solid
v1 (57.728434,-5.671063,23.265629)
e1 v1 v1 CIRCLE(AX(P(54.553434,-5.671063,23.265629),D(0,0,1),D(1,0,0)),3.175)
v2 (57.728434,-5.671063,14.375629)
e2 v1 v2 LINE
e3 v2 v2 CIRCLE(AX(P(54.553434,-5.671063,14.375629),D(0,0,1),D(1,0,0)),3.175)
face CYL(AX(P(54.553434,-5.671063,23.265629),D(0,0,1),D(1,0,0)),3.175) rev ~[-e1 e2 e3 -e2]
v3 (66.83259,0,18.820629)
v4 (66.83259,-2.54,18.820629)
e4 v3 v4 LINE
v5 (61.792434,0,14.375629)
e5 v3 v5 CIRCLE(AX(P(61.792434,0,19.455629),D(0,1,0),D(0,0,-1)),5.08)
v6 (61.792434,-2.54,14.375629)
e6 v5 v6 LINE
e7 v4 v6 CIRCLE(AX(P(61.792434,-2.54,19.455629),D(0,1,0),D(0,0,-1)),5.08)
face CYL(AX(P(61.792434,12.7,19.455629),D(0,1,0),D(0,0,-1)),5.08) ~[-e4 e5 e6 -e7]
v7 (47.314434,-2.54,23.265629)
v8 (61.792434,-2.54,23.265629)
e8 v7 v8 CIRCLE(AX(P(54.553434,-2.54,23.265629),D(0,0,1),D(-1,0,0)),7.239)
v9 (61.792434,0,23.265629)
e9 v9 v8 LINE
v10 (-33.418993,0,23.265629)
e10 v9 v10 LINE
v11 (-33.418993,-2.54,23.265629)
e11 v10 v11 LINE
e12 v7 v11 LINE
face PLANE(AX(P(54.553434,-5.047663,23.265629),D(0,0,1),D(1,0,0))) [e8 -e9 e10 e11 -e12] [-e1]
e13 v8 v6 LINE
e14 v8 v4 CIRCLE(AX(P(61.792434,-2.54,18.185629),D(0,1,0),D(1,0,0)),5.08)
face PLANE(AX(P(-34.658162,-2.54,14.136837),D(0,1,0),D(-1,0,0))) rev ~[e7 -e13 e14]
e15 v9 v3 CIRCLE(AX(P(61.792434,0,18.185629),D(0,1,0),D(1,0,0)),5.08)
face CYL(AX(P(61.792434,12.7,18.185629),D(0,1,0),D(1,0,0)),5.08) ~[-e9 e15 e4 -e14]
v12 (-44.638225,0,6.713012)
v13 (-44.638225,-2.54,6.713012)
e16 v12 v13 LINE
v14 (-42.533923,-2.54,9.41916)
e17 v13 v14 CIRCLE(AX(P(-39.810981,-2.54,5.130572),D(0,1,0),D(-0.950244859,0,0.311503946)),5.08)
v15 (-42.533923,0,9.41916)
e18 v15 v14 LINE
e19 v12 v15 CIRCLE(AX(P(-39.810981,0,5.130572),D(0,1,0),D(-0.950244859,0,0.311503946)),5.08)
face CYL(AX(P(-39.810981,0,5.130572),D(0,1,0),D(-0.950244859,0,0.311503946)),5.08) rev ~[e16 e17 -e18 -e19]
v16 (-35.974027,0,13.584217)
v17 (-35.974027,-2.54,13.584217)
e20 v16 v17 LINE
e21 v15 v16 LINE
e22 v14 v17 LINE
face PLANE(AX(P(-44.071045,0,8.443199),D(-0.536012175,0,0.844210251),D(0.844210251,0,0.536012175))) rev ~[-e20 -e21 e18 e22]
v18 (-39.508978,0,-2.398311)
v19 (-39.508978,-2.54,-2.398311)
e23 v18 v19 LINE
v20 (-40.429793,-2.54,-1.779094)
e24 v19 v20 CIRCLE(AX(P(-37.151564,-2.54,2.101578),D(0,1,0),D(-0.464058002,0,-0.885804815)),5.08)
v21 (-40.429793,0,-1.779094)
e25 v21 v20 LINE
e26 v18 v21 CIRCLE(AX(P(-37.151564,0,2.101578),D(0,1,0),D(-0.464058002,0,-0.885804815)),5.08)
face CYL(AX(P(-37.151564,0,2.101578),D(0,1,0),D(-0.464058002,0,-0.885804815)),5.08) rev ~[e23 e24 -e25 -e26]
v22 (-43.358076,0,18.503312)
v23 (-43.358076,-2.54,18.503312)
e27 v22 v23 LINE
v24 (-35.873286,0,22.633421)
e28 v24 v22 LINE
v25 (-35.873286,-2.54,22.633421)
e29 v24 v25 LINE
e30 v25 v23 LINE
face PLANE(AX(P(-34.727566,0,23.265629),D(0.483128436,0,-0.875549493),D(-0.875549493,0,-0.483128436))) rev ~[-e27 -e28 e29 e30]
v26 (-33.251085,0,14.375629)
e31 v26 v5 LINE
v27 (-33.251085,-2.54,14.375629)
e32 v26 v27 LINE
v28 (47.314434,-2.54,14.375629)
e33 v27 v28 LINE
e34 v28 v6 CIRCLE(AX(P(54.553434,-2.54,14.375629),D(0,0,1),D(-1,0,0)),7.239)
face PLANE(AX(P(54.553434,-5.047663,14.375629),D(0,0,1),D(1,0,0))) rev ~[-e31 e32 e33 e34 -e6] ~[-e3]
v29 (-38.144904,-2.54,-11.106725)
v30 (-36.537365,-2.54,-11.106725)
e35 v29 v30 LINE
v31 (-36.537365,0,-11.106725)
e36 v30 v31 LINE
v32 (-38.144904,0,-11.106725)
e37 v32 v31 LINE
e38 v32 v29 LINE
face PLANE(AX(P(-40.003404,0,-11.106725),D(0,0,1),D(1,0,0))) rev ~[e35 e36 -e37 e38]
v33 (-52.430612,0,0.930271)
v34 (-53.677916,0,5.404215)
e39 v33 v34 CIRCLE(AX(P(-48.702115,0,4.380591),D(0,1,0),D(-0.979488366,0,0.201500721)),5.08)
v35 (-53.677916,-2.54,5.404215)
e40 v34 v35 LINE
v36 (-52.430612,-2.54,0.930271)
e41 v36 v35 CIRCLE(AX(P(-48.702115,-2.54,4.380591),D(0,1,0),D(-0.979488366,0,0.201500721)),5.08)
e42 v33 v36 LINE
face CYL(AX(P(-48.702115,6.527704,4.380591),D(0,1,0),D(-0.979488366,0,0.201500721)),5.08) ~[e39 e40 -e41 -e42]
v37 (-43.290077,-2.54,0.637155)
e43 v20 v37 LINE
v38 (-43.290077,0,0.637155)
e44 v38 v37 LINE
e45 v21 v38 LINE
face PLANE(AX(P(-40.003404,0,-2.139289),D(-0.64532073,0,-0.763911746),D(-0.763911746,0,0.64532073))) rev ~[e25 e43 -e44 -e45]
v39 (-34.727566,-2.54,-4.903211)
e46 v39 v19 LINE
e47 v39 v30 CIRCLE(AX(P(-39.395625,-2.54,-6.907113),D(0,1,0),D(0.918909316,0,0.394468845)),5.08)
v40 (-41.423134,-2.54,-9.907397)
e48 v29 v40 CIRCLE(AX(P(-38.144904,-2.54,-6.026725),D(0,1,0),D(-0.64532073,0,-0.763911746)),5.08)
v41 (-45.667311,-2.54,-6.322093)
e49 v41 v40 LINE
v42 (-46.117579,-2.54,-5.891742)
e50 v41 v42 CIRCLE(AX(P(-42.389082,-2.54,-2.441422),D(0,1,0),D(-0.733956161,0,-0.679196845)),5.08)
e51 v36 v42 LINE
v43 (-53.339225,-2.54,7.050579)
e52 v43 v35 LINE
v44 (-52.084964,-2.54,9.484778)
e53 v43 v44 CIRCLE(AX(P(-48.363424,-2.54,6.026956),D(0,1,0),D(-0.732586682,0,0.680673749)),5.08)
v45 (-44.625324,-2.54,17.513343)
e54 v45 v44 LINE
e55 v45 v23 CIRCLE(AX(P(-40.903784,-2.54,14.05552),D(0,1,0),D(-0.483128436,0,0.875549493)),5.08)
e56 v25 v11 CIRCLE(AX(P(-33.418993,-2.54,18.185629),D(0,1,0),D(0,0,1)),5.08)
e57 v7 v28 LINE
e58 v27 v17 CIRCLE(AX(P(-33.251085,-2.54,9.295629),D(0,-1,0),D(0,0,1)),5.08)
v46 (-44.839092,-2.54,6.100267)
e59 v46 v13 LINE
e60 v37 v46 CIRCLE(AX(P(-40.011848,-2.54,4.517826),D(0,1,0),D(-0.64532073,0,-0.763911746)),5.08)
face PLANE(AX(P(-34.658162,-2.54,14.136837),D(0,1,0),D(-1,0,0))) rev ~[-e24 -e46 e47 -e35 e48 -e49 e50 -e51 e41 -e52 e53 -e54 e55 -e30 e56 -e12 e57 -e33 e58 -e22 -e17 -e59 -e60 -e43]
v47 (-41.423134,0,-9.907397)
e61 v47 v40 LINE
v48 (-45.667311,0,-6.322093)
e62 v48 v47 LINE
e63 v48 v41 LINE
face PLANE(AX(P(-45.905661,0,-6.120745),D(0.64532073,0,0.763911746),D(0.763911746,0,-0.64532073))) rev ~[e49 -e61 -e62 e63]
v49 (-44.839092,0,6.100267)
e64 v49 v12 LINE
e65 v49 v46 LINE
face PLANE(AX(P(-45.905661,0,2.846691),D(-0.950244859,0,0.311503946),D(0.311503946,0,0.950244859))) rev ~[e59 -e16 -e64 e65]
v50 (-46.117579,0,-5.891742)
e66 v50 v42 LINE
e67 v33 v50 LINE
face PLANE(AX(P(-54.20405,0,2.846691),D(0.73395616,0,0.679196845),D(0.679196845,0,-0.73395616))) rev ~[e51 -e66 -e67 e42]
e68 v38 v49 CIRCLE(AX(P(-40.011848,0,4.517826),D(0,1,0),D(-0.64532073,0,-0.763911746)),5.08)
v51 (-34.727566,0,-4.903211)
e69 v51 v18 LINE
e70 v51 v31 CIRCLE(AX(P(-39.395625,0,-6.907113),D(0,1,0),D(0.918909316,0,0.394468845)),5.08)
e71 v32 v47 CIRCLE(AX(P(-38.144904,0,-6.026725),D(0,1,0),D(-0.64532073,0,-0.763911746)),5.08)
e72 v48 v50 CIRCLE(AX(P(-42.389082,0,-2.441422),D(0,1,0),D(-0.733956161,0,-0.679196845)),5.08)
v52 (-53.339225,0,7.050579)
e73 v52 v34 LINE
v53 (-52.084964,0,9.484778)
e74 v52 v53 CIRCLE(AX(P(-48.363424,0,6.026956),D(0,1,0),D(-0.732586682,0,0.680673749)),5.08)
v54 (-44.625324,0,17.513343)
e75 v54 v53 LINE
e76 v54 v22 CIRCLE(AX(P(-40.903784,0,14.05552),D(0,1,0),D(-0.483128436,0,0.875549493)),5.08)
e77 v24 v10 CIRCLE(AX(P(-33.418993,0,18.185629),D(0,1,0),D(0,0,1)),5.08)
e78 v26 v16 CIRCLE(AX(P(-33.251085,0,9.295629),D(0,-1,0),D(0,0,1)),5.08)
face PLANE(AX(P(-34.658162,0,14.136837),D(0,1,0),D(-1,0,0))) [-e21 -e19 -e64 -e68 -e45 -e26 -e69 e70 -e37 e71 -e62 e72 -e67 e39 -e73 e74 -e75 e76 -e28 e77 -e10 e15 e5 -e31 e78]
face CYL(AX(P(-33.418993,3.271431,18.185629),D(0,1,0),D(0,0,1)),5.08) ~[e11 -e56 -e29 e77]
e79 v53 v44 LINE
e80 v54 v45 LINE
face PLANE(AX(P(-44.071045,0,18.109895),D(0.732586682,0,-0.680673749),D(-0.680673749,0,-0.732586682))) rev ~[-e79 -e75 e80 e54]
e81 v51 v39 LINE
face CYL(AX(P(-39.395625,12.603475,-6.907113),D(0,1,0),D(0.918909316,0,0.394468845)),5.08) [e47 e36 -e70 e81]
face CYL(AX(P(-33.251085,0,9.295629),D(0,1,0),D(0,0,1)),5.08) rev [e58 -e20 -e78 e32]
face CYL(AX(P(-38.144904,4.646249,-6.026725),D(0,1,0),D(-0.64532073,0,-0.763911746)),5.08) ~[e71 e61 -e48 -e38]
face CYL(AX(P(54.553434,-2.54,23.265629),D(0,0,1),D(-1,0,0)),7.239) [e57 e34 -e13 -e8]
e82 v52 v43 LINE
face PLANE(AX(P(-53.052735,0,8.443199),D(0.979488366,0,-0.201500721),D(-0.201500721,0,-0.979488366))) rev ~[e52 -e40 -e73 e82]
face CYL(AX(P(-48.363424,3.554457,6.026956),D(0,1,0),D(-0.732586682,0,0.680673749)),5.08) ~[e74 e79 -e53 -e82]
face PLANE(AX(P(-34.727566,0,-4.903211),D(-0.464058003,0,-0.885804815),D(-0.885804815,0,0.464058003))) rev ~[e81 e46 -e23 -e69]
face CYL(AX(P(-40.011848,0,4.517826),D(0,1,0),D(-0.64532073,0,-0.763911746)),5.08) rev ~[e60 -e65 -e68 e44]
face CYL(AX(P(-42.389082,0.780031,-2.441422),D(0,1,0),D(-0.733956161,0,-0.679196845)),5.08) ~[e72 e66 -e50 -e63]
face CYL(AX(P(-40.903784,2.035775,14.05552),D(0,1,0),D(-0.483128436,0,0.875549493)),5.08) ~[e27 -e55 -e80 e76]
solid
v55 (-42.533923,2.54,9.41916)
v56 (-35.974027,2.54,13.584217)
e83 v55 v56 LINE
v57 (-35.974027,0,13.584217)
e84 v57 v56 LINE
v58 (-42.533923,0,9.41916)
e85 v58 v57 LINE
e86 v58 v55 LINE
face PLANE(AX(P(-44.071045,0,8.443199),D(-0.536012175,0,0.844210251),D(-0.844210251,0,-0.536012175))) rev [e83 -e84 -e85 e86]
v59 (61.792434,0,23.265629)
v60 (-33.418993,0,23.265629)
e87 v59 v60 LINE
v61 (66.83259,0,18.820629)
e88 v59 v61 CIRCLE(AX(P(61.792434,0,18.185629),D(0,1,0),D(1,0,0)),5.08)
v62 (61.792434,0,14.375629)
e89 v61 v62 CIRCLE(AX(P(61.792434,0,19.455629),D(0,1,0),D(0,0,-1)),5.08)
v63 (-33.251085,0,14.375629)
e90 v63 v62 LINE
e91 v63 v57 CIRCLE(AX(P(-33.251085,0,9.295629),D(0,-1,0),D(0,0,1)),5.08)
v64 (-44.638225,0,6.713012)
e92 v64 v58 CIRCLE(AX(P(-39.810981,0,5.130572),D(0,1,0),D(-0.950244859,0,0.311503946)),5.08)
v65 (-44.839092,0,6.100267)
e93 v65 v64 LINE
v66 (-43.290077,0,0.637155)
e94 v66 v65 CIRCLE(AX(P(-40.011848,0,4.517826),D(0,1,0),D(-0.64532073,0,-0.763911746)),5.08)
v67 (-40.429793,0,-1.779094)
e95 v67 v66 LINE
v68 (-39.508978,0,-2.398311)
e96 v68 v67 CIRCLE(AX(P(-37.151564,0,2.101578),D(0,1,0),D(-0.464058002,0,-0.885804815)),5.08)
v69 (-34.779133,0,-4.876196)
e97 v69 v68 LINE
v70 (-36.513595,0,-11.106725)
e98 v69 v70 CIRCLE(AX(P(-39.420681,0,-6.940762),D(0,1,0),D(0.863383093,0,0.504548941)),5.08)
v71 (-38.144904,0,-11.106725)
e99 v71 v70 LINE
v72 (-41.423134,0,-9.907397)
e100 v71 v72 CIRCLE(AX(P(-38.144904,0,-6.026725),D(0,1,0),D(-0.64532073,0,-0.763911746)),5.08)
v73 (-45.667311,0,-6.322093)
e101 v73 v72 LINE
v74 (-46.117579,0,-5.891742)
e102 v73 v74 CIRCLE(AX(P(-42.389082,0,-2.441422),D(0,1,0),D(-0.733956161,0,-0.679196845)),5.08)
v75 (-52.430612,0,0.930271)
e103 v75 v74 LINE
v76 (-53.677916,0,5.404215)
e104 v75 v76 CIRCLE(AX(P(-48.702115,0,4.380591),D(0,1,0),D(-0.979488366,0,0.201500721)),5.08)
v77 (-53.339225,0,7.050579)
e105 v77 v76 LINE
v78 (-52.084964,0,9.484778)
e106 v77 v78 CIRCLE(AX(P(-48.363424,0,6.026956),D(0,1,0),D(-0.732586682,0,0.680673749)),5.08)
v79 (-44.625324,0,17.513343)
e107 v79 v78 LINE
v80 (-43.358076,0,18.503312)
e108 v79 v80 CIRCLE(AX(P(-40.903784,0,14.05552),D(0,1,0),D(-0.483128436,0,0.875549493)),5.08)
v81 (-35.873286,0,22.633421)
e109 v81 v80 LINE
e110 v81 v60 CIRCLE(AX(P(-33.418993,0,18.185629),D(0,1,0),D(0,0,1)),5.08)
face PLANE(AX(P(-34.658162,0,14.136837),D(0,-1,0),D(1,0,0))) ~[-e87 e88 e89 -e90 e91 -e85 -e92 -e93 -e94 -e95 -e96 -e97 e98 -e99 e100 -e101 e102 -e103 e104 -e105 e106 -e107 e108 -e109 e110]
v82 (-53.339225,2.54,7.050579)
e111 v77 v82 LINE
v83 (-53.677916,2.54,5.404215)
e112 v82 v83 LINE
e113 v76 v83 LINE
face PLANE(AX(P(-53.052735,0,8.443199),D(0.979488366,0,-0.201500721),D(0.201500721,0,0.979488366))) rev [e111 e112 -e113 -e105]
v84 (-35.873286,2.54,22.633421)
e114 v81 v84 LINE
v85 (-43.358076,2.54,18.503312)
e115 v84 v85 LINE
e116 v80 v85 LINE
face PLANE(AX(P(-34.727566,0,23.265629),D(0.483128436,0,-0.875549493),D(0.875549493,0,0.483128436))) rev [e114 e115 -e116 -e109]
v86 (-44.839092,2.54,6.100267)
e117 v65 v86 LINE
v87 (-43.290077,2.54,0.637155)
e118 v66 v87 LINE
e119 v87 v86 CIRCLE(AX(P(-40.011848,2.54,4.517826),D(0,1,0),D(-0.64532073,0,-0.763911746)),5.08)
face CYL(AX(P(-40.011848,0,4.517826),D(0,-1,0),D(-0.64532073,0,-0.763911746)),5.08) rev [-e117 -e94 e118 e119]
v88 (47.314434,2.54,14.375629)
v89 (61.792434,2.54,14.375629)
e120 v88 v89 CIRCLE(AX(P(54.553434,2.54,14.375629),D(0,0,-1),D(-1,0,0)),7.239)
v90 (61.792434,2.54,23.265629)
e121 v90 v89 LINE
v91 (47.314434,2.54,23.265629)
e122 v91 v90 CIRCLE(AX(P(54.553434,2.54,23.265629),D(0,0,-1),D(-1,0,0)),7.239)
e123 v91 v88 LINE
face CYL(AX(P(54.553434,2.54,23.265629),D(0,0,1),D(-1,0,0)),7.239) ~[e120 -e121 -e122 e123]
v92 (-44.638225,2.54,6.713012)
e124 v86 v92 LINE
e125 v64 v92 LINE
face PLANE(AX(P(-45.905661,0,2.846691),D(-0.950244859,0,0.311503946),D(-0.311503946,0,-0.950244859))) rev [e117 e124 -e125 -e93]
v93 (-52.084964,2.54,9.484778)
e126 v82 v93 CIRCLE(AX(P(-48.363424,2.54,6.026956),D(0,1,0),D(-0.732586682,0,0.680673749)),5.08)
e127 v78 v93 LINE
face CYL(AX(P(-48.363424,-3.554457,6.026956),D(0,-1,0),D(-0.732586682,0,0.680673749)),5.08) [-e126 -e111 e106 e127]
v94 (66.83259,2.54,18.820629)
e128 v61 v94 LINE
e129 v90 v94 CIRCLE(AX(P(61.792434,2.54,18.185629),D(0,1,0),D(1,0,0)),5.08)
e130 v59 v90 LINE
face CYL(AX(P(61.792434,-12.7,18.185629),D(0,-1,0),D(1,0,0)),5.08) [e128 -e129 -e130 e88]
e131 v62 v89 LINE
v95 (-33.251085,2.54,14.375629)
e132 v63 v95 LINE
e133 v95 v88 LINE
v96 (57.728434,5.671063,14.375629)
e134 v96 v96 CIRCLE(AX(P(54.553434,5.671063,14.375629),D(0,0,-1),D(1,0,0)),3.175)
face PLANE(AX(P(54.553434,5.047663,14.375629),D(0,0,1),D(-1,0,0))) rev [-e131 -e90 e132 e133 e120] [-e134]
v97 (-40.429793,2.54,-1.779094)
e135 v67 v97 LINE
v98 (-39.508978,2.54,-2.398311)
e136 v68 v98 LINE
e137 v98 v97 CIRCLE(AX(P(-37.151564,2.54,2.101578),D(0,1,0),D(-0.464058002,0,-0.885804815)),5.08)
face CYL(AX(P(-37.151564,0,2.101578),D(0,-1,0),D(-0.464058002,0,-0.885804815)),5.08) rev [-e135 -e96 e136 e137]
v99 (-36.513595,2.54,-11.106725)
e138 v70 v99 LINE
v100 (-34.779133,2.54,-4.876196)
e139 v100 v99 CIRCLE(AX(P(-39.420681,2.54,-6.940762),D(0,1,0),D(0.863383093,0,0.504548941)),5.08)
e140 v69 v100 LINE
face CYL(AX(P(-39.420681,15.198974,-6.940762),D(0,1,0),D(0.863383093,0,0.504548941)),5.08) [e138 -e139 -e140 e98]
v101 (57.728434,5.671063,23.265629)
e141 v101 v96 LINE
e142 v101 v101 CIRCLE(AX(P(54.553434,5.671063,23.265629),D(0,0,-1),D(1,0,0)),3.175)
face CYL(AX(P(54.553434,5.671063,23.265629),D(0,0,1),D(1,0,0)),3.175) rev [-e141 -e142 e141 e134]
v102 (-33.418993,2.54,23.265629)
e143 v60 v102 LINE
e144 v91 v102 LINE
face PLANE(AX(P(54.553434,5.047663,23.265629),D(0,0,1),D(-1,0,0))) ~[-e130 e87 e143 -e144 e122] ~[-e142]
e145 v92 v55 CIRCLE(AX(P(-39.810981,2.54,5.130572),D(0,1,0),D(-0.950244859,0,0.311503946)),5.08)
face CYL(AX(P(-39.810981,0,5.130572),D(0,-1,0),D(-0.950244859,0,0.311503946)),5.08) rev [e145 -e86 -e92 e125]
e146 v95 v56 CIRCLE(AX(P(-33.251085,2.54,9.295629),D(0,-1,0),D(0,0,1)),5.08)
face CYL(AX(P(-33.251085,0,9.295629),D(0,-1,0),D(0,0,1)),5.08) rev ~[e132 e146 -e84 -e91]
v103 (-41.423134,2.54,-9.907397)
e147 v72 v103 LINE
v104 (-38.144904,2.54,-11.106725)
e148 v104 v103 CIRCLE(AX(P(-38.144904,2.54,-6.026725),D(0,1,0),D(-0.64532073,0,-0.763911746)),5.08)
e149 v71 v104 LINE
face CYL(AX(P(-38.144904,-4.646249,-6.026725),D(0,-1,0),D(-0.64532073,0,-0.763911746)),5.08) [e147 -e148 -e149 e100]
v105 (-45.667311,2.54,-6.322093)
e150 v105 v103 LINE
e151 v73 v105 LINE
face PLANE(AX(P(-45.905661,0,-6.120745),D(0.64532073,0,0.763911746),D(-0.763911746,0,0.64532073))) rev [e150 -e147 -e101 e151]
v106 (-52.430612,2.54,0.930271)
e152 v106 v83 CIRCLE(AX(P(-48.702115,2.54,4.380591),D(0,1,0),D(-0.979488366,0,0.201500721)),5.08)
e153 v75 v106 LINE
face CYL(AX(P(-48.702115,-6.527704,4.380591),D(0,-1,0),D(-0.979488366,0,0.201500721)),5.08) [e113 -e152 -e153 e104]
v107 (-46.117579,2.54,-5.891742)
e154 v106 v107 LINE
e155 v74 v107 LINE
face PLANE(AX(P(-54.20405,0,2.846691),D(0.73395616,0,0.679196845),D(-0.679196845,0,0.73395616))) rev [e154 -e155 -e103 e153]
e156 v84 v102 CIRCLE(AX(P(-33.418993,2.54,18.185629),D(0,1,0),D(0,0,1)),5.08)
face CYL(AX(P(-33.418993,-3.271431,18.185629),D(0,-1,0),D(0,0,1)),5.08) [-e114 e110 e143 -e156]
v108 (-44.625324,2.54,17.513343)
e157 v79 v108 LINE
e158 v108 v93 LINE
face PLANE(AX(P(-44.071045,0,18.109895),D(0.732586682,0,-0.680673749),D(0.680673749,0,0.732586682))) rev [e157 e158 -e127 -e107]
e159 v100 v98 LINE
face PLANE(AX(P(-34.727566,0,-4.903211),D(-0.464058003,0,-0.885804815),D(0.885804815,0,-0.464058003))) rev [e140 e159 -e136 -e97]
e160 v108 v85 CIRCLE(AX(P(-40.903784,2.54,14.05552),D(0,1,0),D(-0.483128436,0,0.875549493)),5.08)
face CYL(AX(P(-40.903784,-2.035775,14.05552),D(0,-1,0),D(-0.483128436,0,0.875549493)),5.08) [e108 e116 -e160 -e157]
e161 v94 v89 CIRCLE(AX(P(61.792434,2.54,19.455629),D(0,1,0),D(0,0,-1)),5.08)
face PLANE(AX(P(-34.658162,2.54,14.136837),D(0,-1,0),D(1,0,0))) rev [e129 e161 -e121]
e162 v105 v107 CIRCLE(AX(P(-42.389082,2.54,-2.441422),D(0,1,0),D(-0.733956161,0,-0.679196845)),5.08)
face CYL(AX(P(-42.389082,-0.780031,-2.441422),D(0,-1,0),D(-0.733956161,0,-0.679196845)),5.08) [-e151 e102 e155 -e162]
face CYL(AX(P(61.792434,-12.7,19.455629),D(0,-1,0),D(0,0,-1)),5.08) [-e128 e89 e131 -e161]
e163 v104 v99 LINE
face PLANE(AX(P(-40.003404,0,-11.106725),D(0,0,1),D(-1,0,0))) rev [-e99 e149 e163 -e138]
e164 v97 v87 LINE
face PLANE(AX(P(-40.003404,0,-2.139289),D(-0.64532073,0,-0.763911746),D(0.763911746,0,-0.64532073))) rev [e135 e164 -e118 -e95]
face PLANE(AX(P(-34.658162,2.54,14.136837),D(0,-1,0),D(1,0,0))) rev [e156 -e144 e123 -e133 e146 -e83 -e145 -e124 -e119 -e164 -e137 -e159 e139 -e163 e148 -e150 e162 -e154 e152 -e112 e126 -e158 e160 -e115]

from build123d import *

# Parameters (mm, degrees)
F1_DEPTH      = 2.54
F2_T1_DEPTH   = 2.54
F2_T3_DEPTH   = 27.94
F2_T5_DEPTH   = 9.0828624111
F2_T7_DEPTH   = 6.6115491723
F2_T9_DEPTH   = 9.6489143737
F2_T11_DEPTH  = 15.5954084718
F2_T13_DEPTH  = 4.1000627259
F2_T15_DEPTH  = 11.8324981012
F4_DEPTH      = 8.89
F5_R          = 3.175
F6_DEPTH      = 25.4
F8_T1_DEPTH   = 27.7469499795
F8_2_T1_DEPTH = 27.8579477964


# Not quite as in the source:
# - a fillet or chamfer that OpenCascade refuses, or shapes differently, is made with other operations: its cross-section is extruded or revolved along the edge and cut away or added


with BuildPart() as f1:
    # F0 (on Front) → F1 (new body)
    with BuildSketch(Plane.XZ):
        Polygon((66.8724340558, 14.3756293181), (66.8724340558, 23.2656293181), (-34.7275659442, 23.2656293181), (-44.0710447729, 18.1098952889), (-53.0527345836, 8.4431990981), (-54.2040504515, 2.8466905933), (-45.9056608379, -6.1207453094), (-40.0034040213, -11.1067253005), (-36.5135949825, -11.1067253005), (-32.4798657579, -8.7494706538), (-34.7275659442, -4.9032107927), (-40.0034040213, -2.1392893977), (-45.9056608379, 2.8466905933), (-44.0710447729, 8.4431990981), (-34.7275659442, 14.3756293181), align=None)
    extrude(amount=F1_DEPTH)

    # F2: fillet of radius 5.08 on 12 edges, made by hand

    # F2_s2 → F2_t1 (join)
    with BuildSketch(Plane.XZ):
        with BuildLine():
            ThreePointArc((-33.2510846992, 14.3756293181), (-34.6688950832, 14.1737656134), (-35.9740265471, 13.5842173949))
            Line((-35.9740265471, 13.5842173949), (-34.7275659442, 14.3756293181))
            Line((-34.7275659442, 14.3756293181), (-33.2510846992, 14.3756293181))
        make_face()
        with BuildLine():
            ThreePointArc((-39.5089784479, -2.398310505), (-39.9863438705, -2.1139198711), (-40.4297931043, -1.7790937128))
            Line((-40.4297931043, -1.7790937128), (-40.0034040213, -2.1392893977))
            Line((-40.0034040213, -2.1392893977), (-39.5089784479, -2.398310505))
        make_face()
        with BuildLine():
            ThreePointArc((-43.2900772259, 0.6371548243), (-44.8991857722, 3.1320672478), (-44.8390917989, 6.1002665384))
            Line((-44.8390917989, 6.1002665384), (-45.9056608379, 2.8466905933))
            Line((-45.9056608379, 2.8466905933), (-43.2900772259, 0.6371548243))
        make_face()
        with BuildLine():
            ThreePointArc((-44.6382251268, 6.7130116573), (-43.8212350308, 8.2489469203), (-42.5339230923, 9.419159688))
            Line((-42.5339230923, 9.419159688), (-44.0710447729, 8.4431990981))
            Line((-44.0710447729, 8.4431990981), (-44.6382251268, 6.7130116573))
        make_face()
    extrude(amount=F2_T1_DEPTH)

    # F2_s4 → F2_t3 (cut)
    with BuildSketch(Plane.XZ.offset(-12.7)):
        with BuildLine():
            ThreePointArc((61.7924340558, 14.3756293181), (65.3845365042, 15.8635268697), (66.8724340558, 19.4556293181))
            Line((66.8724340558, 19.4556293181), (66.8724340558, 14.3756293181))
            Line((66.8724340558, 14.3756293181), (61.7924340558, 14.3756293181))
        make_face()
        with BuildLine():
            ThreePointArc((66.8724340558, 18.1856293181), (65.3845365042, 21.7777317665), (61.7924340558, 23.2656293181))
            Line((61.7924340558, 23.2656293181), (66.8724340558, 23.2656293181))
            Line((66.8724340558, 23.2656293181), (66.8724340558, 18.1856293181))
        make_face()
    extrude(amount=F2_T3_DEPTH, mode=Mode.SUBTRACT)

    # F2_s6 → F2_t5 (cut)
    with BuildSketch(Plane.XZ.offset(-3.2714312055)):
        with BuildLine():
            ThreePointArc((-33.418993462, 23.2656293181), (-34.6861989643, 23.1050388573), (-35.8732859172, 22.6334207413))
            Line((-35.8732859172, 22.6334207413), (-34.7275659442, 23.2656293181))
            Line((-34.7275659442, 23.2656293181), (-33.418993462, 23.2656293181))
        make_face()
    extrude(amount=F2_T5_DEPTH, mode=Mode.SUBTRACT)

    # F2_s8 → F2_t7 (cut)
    with BuildSketch(Plane.XZ.offset(-2.0357745861)):
        with BuildLine():
            ThreePointArc((-43.3580762104, 18.5033115257), (-44.0311208398, 18.0587891116), (-44.625324101, 17.513342749))
            Line((-44.625324101, 17.513342749), (-44.0710447729, 18.1098952889))
            Line((-44.0710447729, 18.1098952889), (-43.3580762104, 18.5033115257))
        make_face()
    extrude(amount=F2_T7_DEPTH, mode=Mode.SUBTRACT)

    # F2_s10 → F2_t9 (cut)
    with BuildSketch(Plane.XZ.offset(-3.5544571868)):
        with BuildLine():
            ThreePointArc((-52.0849643036, 9.4847782972), (-52.8792037753, 8.3537845313), (-53.3392248579, 7.0505793131))
            Line((-53.3392248579, 7.0505793131), (-53.0527345836, 8.4431990981))
            Line((-53.0527345836, 8.4431990981), (-52.0849643036, 9.4847782972))
        make_face()
    extrude(amount=F2_T9_DEPTH, mode=Mode.SUBTRACT)

    # F2_s12 → F2_t11 (cut)
    with BuildSketch(Plane.XZ.offset(-6.5277042359)):
        with BuildLine():
            ThreePointArc((-53.6779156077, 5.404214736), (-53.5955025606, 3.016349409), (-52.4306120015, 0.9302710989))
            Line((-52.4306120015, 0.9302710989), (-54.2040504515, 2.8466905933))
            Line((-54.2040504515, 2.8466905933), (-53.6779156077, 5.404214736))
        make_face()
    extrude(amount=F2_T11_DEPTH, mode=Mode.SUBTRACT)

    # F2_s14 → F2_t13 (cut)
    with BuildSketch(Plane.XZ.offset(-0.780031363)):
        with BuildLine():
            ThreePointArc((-46.1175787743, -5.8917417798), (-45.8990465897, -6.1138249598), (-45.6673107898, -6.3220934729))
            Line((-45.6673107898, -6.3220934729), (-45.9056608379, -6.1207453094))
            Line((-45.9056608379, -6.1207453094), (-46.1175787743, -5.8917417798))
        make_face()
    extrude(amount=F2_T13_DEPTH, mode=Mode.SUBTRACT)

    # F2_s16 → F2_t15 (cut)
    with BuildSketch(Plane.XZ.offset(-4.6462490506)):
        with BuildLine():
            ThreePointArc((-41.4231337105, -9.9073969684), (-39.890267963, -10.7974805904), (-38.144904401, -11.1067253005))
            Line((-38.144904401, -11.1067253005), (-40.0034040213, -11.1067253005))
            Line((-40.0034040213, -11.1067253005), (-41.4231337105, -9.9073969684))
        make_face()
    extrude(amount=F2_T15_DEPTH, mode=Mode.SUBTRACT)

    # F3 (on face) → F4 (join, through all)
    with BuildSketch(Plane.XY.offset(23.2656293181)):
        with BuildLine():
            Line((61.7924340558, -2.54), (47.3144340558, -2.54))
            ThreePointArc((47.3144340558, -2.54), (54.5534340558, -9.779), (61.7924340558, -2.54))
        make_face()
    extrude(amount=-F4_DEPTH)

    # F5 (on face) → F6 (cut)
    with BuildSketch(Plane.XY.offset(23.2656293181)):
        with Locations((54.5534340558, -5.6710629724)):
            Circle(F5_R)
    extrude(amount=-F6_DEPTH, mode=Mode.SUBTRACT)


with BuildPart() as f7_1:
    # F7: instance of F1
    add(f1.part.mirror(Plane.XZ))

    # F8#2: fillet of radius 5.08 on 1 edges, made by hand

    # F8_2_s2 → F8_2_t1 (cut)
    with BuildSketch(Plane.XZ.offset(-15.1989738982)):
        with BuildLine():
            ThreePointArc((-35.0346945081, -4.3776530361), (-34.4590954637, -8.0312077626), (-36.5135949825, -11.1067253005))
            Line((-36.5135949825, -11.1067253005), (-32.4798657579, -8.7494706538))
            Line((-32.4798657579, -8.7494706538), (-35.0346945081, -4.3776530361))
        make_face()
    extrude(amount=F8_2_T1_DEPTH, mode=Mode.SUBTRACT)


with BuildPart() as f1_1:
    add(f1.part)

    # F8: fillet of radius 5.08 on 1 edges, made by hand

    # F8_s2 → F8_t1 (cut)
    with BuildSketch(Plane.XZ.offset(-12.6034749897)):
        with BuildLine():
            ThreePointArc((-34.7275659442, -4.9032107927), (-34.5706782086, -8.4965419394), (-36.8325166478, -11.2930986378))
            Line((-36.8325166478, -11.2930986378), (-32.4798657579, -8.7494706538))
            Line((-32.4798657579, -8.7494706538), (-34.7275659442, -4.9032107927))
        make_face()
    extrude(amount=F8_T1_DEPTH, mode=Mode.SUBTRACT)


solid = Compound([f7_1.part, f1_1.part])
